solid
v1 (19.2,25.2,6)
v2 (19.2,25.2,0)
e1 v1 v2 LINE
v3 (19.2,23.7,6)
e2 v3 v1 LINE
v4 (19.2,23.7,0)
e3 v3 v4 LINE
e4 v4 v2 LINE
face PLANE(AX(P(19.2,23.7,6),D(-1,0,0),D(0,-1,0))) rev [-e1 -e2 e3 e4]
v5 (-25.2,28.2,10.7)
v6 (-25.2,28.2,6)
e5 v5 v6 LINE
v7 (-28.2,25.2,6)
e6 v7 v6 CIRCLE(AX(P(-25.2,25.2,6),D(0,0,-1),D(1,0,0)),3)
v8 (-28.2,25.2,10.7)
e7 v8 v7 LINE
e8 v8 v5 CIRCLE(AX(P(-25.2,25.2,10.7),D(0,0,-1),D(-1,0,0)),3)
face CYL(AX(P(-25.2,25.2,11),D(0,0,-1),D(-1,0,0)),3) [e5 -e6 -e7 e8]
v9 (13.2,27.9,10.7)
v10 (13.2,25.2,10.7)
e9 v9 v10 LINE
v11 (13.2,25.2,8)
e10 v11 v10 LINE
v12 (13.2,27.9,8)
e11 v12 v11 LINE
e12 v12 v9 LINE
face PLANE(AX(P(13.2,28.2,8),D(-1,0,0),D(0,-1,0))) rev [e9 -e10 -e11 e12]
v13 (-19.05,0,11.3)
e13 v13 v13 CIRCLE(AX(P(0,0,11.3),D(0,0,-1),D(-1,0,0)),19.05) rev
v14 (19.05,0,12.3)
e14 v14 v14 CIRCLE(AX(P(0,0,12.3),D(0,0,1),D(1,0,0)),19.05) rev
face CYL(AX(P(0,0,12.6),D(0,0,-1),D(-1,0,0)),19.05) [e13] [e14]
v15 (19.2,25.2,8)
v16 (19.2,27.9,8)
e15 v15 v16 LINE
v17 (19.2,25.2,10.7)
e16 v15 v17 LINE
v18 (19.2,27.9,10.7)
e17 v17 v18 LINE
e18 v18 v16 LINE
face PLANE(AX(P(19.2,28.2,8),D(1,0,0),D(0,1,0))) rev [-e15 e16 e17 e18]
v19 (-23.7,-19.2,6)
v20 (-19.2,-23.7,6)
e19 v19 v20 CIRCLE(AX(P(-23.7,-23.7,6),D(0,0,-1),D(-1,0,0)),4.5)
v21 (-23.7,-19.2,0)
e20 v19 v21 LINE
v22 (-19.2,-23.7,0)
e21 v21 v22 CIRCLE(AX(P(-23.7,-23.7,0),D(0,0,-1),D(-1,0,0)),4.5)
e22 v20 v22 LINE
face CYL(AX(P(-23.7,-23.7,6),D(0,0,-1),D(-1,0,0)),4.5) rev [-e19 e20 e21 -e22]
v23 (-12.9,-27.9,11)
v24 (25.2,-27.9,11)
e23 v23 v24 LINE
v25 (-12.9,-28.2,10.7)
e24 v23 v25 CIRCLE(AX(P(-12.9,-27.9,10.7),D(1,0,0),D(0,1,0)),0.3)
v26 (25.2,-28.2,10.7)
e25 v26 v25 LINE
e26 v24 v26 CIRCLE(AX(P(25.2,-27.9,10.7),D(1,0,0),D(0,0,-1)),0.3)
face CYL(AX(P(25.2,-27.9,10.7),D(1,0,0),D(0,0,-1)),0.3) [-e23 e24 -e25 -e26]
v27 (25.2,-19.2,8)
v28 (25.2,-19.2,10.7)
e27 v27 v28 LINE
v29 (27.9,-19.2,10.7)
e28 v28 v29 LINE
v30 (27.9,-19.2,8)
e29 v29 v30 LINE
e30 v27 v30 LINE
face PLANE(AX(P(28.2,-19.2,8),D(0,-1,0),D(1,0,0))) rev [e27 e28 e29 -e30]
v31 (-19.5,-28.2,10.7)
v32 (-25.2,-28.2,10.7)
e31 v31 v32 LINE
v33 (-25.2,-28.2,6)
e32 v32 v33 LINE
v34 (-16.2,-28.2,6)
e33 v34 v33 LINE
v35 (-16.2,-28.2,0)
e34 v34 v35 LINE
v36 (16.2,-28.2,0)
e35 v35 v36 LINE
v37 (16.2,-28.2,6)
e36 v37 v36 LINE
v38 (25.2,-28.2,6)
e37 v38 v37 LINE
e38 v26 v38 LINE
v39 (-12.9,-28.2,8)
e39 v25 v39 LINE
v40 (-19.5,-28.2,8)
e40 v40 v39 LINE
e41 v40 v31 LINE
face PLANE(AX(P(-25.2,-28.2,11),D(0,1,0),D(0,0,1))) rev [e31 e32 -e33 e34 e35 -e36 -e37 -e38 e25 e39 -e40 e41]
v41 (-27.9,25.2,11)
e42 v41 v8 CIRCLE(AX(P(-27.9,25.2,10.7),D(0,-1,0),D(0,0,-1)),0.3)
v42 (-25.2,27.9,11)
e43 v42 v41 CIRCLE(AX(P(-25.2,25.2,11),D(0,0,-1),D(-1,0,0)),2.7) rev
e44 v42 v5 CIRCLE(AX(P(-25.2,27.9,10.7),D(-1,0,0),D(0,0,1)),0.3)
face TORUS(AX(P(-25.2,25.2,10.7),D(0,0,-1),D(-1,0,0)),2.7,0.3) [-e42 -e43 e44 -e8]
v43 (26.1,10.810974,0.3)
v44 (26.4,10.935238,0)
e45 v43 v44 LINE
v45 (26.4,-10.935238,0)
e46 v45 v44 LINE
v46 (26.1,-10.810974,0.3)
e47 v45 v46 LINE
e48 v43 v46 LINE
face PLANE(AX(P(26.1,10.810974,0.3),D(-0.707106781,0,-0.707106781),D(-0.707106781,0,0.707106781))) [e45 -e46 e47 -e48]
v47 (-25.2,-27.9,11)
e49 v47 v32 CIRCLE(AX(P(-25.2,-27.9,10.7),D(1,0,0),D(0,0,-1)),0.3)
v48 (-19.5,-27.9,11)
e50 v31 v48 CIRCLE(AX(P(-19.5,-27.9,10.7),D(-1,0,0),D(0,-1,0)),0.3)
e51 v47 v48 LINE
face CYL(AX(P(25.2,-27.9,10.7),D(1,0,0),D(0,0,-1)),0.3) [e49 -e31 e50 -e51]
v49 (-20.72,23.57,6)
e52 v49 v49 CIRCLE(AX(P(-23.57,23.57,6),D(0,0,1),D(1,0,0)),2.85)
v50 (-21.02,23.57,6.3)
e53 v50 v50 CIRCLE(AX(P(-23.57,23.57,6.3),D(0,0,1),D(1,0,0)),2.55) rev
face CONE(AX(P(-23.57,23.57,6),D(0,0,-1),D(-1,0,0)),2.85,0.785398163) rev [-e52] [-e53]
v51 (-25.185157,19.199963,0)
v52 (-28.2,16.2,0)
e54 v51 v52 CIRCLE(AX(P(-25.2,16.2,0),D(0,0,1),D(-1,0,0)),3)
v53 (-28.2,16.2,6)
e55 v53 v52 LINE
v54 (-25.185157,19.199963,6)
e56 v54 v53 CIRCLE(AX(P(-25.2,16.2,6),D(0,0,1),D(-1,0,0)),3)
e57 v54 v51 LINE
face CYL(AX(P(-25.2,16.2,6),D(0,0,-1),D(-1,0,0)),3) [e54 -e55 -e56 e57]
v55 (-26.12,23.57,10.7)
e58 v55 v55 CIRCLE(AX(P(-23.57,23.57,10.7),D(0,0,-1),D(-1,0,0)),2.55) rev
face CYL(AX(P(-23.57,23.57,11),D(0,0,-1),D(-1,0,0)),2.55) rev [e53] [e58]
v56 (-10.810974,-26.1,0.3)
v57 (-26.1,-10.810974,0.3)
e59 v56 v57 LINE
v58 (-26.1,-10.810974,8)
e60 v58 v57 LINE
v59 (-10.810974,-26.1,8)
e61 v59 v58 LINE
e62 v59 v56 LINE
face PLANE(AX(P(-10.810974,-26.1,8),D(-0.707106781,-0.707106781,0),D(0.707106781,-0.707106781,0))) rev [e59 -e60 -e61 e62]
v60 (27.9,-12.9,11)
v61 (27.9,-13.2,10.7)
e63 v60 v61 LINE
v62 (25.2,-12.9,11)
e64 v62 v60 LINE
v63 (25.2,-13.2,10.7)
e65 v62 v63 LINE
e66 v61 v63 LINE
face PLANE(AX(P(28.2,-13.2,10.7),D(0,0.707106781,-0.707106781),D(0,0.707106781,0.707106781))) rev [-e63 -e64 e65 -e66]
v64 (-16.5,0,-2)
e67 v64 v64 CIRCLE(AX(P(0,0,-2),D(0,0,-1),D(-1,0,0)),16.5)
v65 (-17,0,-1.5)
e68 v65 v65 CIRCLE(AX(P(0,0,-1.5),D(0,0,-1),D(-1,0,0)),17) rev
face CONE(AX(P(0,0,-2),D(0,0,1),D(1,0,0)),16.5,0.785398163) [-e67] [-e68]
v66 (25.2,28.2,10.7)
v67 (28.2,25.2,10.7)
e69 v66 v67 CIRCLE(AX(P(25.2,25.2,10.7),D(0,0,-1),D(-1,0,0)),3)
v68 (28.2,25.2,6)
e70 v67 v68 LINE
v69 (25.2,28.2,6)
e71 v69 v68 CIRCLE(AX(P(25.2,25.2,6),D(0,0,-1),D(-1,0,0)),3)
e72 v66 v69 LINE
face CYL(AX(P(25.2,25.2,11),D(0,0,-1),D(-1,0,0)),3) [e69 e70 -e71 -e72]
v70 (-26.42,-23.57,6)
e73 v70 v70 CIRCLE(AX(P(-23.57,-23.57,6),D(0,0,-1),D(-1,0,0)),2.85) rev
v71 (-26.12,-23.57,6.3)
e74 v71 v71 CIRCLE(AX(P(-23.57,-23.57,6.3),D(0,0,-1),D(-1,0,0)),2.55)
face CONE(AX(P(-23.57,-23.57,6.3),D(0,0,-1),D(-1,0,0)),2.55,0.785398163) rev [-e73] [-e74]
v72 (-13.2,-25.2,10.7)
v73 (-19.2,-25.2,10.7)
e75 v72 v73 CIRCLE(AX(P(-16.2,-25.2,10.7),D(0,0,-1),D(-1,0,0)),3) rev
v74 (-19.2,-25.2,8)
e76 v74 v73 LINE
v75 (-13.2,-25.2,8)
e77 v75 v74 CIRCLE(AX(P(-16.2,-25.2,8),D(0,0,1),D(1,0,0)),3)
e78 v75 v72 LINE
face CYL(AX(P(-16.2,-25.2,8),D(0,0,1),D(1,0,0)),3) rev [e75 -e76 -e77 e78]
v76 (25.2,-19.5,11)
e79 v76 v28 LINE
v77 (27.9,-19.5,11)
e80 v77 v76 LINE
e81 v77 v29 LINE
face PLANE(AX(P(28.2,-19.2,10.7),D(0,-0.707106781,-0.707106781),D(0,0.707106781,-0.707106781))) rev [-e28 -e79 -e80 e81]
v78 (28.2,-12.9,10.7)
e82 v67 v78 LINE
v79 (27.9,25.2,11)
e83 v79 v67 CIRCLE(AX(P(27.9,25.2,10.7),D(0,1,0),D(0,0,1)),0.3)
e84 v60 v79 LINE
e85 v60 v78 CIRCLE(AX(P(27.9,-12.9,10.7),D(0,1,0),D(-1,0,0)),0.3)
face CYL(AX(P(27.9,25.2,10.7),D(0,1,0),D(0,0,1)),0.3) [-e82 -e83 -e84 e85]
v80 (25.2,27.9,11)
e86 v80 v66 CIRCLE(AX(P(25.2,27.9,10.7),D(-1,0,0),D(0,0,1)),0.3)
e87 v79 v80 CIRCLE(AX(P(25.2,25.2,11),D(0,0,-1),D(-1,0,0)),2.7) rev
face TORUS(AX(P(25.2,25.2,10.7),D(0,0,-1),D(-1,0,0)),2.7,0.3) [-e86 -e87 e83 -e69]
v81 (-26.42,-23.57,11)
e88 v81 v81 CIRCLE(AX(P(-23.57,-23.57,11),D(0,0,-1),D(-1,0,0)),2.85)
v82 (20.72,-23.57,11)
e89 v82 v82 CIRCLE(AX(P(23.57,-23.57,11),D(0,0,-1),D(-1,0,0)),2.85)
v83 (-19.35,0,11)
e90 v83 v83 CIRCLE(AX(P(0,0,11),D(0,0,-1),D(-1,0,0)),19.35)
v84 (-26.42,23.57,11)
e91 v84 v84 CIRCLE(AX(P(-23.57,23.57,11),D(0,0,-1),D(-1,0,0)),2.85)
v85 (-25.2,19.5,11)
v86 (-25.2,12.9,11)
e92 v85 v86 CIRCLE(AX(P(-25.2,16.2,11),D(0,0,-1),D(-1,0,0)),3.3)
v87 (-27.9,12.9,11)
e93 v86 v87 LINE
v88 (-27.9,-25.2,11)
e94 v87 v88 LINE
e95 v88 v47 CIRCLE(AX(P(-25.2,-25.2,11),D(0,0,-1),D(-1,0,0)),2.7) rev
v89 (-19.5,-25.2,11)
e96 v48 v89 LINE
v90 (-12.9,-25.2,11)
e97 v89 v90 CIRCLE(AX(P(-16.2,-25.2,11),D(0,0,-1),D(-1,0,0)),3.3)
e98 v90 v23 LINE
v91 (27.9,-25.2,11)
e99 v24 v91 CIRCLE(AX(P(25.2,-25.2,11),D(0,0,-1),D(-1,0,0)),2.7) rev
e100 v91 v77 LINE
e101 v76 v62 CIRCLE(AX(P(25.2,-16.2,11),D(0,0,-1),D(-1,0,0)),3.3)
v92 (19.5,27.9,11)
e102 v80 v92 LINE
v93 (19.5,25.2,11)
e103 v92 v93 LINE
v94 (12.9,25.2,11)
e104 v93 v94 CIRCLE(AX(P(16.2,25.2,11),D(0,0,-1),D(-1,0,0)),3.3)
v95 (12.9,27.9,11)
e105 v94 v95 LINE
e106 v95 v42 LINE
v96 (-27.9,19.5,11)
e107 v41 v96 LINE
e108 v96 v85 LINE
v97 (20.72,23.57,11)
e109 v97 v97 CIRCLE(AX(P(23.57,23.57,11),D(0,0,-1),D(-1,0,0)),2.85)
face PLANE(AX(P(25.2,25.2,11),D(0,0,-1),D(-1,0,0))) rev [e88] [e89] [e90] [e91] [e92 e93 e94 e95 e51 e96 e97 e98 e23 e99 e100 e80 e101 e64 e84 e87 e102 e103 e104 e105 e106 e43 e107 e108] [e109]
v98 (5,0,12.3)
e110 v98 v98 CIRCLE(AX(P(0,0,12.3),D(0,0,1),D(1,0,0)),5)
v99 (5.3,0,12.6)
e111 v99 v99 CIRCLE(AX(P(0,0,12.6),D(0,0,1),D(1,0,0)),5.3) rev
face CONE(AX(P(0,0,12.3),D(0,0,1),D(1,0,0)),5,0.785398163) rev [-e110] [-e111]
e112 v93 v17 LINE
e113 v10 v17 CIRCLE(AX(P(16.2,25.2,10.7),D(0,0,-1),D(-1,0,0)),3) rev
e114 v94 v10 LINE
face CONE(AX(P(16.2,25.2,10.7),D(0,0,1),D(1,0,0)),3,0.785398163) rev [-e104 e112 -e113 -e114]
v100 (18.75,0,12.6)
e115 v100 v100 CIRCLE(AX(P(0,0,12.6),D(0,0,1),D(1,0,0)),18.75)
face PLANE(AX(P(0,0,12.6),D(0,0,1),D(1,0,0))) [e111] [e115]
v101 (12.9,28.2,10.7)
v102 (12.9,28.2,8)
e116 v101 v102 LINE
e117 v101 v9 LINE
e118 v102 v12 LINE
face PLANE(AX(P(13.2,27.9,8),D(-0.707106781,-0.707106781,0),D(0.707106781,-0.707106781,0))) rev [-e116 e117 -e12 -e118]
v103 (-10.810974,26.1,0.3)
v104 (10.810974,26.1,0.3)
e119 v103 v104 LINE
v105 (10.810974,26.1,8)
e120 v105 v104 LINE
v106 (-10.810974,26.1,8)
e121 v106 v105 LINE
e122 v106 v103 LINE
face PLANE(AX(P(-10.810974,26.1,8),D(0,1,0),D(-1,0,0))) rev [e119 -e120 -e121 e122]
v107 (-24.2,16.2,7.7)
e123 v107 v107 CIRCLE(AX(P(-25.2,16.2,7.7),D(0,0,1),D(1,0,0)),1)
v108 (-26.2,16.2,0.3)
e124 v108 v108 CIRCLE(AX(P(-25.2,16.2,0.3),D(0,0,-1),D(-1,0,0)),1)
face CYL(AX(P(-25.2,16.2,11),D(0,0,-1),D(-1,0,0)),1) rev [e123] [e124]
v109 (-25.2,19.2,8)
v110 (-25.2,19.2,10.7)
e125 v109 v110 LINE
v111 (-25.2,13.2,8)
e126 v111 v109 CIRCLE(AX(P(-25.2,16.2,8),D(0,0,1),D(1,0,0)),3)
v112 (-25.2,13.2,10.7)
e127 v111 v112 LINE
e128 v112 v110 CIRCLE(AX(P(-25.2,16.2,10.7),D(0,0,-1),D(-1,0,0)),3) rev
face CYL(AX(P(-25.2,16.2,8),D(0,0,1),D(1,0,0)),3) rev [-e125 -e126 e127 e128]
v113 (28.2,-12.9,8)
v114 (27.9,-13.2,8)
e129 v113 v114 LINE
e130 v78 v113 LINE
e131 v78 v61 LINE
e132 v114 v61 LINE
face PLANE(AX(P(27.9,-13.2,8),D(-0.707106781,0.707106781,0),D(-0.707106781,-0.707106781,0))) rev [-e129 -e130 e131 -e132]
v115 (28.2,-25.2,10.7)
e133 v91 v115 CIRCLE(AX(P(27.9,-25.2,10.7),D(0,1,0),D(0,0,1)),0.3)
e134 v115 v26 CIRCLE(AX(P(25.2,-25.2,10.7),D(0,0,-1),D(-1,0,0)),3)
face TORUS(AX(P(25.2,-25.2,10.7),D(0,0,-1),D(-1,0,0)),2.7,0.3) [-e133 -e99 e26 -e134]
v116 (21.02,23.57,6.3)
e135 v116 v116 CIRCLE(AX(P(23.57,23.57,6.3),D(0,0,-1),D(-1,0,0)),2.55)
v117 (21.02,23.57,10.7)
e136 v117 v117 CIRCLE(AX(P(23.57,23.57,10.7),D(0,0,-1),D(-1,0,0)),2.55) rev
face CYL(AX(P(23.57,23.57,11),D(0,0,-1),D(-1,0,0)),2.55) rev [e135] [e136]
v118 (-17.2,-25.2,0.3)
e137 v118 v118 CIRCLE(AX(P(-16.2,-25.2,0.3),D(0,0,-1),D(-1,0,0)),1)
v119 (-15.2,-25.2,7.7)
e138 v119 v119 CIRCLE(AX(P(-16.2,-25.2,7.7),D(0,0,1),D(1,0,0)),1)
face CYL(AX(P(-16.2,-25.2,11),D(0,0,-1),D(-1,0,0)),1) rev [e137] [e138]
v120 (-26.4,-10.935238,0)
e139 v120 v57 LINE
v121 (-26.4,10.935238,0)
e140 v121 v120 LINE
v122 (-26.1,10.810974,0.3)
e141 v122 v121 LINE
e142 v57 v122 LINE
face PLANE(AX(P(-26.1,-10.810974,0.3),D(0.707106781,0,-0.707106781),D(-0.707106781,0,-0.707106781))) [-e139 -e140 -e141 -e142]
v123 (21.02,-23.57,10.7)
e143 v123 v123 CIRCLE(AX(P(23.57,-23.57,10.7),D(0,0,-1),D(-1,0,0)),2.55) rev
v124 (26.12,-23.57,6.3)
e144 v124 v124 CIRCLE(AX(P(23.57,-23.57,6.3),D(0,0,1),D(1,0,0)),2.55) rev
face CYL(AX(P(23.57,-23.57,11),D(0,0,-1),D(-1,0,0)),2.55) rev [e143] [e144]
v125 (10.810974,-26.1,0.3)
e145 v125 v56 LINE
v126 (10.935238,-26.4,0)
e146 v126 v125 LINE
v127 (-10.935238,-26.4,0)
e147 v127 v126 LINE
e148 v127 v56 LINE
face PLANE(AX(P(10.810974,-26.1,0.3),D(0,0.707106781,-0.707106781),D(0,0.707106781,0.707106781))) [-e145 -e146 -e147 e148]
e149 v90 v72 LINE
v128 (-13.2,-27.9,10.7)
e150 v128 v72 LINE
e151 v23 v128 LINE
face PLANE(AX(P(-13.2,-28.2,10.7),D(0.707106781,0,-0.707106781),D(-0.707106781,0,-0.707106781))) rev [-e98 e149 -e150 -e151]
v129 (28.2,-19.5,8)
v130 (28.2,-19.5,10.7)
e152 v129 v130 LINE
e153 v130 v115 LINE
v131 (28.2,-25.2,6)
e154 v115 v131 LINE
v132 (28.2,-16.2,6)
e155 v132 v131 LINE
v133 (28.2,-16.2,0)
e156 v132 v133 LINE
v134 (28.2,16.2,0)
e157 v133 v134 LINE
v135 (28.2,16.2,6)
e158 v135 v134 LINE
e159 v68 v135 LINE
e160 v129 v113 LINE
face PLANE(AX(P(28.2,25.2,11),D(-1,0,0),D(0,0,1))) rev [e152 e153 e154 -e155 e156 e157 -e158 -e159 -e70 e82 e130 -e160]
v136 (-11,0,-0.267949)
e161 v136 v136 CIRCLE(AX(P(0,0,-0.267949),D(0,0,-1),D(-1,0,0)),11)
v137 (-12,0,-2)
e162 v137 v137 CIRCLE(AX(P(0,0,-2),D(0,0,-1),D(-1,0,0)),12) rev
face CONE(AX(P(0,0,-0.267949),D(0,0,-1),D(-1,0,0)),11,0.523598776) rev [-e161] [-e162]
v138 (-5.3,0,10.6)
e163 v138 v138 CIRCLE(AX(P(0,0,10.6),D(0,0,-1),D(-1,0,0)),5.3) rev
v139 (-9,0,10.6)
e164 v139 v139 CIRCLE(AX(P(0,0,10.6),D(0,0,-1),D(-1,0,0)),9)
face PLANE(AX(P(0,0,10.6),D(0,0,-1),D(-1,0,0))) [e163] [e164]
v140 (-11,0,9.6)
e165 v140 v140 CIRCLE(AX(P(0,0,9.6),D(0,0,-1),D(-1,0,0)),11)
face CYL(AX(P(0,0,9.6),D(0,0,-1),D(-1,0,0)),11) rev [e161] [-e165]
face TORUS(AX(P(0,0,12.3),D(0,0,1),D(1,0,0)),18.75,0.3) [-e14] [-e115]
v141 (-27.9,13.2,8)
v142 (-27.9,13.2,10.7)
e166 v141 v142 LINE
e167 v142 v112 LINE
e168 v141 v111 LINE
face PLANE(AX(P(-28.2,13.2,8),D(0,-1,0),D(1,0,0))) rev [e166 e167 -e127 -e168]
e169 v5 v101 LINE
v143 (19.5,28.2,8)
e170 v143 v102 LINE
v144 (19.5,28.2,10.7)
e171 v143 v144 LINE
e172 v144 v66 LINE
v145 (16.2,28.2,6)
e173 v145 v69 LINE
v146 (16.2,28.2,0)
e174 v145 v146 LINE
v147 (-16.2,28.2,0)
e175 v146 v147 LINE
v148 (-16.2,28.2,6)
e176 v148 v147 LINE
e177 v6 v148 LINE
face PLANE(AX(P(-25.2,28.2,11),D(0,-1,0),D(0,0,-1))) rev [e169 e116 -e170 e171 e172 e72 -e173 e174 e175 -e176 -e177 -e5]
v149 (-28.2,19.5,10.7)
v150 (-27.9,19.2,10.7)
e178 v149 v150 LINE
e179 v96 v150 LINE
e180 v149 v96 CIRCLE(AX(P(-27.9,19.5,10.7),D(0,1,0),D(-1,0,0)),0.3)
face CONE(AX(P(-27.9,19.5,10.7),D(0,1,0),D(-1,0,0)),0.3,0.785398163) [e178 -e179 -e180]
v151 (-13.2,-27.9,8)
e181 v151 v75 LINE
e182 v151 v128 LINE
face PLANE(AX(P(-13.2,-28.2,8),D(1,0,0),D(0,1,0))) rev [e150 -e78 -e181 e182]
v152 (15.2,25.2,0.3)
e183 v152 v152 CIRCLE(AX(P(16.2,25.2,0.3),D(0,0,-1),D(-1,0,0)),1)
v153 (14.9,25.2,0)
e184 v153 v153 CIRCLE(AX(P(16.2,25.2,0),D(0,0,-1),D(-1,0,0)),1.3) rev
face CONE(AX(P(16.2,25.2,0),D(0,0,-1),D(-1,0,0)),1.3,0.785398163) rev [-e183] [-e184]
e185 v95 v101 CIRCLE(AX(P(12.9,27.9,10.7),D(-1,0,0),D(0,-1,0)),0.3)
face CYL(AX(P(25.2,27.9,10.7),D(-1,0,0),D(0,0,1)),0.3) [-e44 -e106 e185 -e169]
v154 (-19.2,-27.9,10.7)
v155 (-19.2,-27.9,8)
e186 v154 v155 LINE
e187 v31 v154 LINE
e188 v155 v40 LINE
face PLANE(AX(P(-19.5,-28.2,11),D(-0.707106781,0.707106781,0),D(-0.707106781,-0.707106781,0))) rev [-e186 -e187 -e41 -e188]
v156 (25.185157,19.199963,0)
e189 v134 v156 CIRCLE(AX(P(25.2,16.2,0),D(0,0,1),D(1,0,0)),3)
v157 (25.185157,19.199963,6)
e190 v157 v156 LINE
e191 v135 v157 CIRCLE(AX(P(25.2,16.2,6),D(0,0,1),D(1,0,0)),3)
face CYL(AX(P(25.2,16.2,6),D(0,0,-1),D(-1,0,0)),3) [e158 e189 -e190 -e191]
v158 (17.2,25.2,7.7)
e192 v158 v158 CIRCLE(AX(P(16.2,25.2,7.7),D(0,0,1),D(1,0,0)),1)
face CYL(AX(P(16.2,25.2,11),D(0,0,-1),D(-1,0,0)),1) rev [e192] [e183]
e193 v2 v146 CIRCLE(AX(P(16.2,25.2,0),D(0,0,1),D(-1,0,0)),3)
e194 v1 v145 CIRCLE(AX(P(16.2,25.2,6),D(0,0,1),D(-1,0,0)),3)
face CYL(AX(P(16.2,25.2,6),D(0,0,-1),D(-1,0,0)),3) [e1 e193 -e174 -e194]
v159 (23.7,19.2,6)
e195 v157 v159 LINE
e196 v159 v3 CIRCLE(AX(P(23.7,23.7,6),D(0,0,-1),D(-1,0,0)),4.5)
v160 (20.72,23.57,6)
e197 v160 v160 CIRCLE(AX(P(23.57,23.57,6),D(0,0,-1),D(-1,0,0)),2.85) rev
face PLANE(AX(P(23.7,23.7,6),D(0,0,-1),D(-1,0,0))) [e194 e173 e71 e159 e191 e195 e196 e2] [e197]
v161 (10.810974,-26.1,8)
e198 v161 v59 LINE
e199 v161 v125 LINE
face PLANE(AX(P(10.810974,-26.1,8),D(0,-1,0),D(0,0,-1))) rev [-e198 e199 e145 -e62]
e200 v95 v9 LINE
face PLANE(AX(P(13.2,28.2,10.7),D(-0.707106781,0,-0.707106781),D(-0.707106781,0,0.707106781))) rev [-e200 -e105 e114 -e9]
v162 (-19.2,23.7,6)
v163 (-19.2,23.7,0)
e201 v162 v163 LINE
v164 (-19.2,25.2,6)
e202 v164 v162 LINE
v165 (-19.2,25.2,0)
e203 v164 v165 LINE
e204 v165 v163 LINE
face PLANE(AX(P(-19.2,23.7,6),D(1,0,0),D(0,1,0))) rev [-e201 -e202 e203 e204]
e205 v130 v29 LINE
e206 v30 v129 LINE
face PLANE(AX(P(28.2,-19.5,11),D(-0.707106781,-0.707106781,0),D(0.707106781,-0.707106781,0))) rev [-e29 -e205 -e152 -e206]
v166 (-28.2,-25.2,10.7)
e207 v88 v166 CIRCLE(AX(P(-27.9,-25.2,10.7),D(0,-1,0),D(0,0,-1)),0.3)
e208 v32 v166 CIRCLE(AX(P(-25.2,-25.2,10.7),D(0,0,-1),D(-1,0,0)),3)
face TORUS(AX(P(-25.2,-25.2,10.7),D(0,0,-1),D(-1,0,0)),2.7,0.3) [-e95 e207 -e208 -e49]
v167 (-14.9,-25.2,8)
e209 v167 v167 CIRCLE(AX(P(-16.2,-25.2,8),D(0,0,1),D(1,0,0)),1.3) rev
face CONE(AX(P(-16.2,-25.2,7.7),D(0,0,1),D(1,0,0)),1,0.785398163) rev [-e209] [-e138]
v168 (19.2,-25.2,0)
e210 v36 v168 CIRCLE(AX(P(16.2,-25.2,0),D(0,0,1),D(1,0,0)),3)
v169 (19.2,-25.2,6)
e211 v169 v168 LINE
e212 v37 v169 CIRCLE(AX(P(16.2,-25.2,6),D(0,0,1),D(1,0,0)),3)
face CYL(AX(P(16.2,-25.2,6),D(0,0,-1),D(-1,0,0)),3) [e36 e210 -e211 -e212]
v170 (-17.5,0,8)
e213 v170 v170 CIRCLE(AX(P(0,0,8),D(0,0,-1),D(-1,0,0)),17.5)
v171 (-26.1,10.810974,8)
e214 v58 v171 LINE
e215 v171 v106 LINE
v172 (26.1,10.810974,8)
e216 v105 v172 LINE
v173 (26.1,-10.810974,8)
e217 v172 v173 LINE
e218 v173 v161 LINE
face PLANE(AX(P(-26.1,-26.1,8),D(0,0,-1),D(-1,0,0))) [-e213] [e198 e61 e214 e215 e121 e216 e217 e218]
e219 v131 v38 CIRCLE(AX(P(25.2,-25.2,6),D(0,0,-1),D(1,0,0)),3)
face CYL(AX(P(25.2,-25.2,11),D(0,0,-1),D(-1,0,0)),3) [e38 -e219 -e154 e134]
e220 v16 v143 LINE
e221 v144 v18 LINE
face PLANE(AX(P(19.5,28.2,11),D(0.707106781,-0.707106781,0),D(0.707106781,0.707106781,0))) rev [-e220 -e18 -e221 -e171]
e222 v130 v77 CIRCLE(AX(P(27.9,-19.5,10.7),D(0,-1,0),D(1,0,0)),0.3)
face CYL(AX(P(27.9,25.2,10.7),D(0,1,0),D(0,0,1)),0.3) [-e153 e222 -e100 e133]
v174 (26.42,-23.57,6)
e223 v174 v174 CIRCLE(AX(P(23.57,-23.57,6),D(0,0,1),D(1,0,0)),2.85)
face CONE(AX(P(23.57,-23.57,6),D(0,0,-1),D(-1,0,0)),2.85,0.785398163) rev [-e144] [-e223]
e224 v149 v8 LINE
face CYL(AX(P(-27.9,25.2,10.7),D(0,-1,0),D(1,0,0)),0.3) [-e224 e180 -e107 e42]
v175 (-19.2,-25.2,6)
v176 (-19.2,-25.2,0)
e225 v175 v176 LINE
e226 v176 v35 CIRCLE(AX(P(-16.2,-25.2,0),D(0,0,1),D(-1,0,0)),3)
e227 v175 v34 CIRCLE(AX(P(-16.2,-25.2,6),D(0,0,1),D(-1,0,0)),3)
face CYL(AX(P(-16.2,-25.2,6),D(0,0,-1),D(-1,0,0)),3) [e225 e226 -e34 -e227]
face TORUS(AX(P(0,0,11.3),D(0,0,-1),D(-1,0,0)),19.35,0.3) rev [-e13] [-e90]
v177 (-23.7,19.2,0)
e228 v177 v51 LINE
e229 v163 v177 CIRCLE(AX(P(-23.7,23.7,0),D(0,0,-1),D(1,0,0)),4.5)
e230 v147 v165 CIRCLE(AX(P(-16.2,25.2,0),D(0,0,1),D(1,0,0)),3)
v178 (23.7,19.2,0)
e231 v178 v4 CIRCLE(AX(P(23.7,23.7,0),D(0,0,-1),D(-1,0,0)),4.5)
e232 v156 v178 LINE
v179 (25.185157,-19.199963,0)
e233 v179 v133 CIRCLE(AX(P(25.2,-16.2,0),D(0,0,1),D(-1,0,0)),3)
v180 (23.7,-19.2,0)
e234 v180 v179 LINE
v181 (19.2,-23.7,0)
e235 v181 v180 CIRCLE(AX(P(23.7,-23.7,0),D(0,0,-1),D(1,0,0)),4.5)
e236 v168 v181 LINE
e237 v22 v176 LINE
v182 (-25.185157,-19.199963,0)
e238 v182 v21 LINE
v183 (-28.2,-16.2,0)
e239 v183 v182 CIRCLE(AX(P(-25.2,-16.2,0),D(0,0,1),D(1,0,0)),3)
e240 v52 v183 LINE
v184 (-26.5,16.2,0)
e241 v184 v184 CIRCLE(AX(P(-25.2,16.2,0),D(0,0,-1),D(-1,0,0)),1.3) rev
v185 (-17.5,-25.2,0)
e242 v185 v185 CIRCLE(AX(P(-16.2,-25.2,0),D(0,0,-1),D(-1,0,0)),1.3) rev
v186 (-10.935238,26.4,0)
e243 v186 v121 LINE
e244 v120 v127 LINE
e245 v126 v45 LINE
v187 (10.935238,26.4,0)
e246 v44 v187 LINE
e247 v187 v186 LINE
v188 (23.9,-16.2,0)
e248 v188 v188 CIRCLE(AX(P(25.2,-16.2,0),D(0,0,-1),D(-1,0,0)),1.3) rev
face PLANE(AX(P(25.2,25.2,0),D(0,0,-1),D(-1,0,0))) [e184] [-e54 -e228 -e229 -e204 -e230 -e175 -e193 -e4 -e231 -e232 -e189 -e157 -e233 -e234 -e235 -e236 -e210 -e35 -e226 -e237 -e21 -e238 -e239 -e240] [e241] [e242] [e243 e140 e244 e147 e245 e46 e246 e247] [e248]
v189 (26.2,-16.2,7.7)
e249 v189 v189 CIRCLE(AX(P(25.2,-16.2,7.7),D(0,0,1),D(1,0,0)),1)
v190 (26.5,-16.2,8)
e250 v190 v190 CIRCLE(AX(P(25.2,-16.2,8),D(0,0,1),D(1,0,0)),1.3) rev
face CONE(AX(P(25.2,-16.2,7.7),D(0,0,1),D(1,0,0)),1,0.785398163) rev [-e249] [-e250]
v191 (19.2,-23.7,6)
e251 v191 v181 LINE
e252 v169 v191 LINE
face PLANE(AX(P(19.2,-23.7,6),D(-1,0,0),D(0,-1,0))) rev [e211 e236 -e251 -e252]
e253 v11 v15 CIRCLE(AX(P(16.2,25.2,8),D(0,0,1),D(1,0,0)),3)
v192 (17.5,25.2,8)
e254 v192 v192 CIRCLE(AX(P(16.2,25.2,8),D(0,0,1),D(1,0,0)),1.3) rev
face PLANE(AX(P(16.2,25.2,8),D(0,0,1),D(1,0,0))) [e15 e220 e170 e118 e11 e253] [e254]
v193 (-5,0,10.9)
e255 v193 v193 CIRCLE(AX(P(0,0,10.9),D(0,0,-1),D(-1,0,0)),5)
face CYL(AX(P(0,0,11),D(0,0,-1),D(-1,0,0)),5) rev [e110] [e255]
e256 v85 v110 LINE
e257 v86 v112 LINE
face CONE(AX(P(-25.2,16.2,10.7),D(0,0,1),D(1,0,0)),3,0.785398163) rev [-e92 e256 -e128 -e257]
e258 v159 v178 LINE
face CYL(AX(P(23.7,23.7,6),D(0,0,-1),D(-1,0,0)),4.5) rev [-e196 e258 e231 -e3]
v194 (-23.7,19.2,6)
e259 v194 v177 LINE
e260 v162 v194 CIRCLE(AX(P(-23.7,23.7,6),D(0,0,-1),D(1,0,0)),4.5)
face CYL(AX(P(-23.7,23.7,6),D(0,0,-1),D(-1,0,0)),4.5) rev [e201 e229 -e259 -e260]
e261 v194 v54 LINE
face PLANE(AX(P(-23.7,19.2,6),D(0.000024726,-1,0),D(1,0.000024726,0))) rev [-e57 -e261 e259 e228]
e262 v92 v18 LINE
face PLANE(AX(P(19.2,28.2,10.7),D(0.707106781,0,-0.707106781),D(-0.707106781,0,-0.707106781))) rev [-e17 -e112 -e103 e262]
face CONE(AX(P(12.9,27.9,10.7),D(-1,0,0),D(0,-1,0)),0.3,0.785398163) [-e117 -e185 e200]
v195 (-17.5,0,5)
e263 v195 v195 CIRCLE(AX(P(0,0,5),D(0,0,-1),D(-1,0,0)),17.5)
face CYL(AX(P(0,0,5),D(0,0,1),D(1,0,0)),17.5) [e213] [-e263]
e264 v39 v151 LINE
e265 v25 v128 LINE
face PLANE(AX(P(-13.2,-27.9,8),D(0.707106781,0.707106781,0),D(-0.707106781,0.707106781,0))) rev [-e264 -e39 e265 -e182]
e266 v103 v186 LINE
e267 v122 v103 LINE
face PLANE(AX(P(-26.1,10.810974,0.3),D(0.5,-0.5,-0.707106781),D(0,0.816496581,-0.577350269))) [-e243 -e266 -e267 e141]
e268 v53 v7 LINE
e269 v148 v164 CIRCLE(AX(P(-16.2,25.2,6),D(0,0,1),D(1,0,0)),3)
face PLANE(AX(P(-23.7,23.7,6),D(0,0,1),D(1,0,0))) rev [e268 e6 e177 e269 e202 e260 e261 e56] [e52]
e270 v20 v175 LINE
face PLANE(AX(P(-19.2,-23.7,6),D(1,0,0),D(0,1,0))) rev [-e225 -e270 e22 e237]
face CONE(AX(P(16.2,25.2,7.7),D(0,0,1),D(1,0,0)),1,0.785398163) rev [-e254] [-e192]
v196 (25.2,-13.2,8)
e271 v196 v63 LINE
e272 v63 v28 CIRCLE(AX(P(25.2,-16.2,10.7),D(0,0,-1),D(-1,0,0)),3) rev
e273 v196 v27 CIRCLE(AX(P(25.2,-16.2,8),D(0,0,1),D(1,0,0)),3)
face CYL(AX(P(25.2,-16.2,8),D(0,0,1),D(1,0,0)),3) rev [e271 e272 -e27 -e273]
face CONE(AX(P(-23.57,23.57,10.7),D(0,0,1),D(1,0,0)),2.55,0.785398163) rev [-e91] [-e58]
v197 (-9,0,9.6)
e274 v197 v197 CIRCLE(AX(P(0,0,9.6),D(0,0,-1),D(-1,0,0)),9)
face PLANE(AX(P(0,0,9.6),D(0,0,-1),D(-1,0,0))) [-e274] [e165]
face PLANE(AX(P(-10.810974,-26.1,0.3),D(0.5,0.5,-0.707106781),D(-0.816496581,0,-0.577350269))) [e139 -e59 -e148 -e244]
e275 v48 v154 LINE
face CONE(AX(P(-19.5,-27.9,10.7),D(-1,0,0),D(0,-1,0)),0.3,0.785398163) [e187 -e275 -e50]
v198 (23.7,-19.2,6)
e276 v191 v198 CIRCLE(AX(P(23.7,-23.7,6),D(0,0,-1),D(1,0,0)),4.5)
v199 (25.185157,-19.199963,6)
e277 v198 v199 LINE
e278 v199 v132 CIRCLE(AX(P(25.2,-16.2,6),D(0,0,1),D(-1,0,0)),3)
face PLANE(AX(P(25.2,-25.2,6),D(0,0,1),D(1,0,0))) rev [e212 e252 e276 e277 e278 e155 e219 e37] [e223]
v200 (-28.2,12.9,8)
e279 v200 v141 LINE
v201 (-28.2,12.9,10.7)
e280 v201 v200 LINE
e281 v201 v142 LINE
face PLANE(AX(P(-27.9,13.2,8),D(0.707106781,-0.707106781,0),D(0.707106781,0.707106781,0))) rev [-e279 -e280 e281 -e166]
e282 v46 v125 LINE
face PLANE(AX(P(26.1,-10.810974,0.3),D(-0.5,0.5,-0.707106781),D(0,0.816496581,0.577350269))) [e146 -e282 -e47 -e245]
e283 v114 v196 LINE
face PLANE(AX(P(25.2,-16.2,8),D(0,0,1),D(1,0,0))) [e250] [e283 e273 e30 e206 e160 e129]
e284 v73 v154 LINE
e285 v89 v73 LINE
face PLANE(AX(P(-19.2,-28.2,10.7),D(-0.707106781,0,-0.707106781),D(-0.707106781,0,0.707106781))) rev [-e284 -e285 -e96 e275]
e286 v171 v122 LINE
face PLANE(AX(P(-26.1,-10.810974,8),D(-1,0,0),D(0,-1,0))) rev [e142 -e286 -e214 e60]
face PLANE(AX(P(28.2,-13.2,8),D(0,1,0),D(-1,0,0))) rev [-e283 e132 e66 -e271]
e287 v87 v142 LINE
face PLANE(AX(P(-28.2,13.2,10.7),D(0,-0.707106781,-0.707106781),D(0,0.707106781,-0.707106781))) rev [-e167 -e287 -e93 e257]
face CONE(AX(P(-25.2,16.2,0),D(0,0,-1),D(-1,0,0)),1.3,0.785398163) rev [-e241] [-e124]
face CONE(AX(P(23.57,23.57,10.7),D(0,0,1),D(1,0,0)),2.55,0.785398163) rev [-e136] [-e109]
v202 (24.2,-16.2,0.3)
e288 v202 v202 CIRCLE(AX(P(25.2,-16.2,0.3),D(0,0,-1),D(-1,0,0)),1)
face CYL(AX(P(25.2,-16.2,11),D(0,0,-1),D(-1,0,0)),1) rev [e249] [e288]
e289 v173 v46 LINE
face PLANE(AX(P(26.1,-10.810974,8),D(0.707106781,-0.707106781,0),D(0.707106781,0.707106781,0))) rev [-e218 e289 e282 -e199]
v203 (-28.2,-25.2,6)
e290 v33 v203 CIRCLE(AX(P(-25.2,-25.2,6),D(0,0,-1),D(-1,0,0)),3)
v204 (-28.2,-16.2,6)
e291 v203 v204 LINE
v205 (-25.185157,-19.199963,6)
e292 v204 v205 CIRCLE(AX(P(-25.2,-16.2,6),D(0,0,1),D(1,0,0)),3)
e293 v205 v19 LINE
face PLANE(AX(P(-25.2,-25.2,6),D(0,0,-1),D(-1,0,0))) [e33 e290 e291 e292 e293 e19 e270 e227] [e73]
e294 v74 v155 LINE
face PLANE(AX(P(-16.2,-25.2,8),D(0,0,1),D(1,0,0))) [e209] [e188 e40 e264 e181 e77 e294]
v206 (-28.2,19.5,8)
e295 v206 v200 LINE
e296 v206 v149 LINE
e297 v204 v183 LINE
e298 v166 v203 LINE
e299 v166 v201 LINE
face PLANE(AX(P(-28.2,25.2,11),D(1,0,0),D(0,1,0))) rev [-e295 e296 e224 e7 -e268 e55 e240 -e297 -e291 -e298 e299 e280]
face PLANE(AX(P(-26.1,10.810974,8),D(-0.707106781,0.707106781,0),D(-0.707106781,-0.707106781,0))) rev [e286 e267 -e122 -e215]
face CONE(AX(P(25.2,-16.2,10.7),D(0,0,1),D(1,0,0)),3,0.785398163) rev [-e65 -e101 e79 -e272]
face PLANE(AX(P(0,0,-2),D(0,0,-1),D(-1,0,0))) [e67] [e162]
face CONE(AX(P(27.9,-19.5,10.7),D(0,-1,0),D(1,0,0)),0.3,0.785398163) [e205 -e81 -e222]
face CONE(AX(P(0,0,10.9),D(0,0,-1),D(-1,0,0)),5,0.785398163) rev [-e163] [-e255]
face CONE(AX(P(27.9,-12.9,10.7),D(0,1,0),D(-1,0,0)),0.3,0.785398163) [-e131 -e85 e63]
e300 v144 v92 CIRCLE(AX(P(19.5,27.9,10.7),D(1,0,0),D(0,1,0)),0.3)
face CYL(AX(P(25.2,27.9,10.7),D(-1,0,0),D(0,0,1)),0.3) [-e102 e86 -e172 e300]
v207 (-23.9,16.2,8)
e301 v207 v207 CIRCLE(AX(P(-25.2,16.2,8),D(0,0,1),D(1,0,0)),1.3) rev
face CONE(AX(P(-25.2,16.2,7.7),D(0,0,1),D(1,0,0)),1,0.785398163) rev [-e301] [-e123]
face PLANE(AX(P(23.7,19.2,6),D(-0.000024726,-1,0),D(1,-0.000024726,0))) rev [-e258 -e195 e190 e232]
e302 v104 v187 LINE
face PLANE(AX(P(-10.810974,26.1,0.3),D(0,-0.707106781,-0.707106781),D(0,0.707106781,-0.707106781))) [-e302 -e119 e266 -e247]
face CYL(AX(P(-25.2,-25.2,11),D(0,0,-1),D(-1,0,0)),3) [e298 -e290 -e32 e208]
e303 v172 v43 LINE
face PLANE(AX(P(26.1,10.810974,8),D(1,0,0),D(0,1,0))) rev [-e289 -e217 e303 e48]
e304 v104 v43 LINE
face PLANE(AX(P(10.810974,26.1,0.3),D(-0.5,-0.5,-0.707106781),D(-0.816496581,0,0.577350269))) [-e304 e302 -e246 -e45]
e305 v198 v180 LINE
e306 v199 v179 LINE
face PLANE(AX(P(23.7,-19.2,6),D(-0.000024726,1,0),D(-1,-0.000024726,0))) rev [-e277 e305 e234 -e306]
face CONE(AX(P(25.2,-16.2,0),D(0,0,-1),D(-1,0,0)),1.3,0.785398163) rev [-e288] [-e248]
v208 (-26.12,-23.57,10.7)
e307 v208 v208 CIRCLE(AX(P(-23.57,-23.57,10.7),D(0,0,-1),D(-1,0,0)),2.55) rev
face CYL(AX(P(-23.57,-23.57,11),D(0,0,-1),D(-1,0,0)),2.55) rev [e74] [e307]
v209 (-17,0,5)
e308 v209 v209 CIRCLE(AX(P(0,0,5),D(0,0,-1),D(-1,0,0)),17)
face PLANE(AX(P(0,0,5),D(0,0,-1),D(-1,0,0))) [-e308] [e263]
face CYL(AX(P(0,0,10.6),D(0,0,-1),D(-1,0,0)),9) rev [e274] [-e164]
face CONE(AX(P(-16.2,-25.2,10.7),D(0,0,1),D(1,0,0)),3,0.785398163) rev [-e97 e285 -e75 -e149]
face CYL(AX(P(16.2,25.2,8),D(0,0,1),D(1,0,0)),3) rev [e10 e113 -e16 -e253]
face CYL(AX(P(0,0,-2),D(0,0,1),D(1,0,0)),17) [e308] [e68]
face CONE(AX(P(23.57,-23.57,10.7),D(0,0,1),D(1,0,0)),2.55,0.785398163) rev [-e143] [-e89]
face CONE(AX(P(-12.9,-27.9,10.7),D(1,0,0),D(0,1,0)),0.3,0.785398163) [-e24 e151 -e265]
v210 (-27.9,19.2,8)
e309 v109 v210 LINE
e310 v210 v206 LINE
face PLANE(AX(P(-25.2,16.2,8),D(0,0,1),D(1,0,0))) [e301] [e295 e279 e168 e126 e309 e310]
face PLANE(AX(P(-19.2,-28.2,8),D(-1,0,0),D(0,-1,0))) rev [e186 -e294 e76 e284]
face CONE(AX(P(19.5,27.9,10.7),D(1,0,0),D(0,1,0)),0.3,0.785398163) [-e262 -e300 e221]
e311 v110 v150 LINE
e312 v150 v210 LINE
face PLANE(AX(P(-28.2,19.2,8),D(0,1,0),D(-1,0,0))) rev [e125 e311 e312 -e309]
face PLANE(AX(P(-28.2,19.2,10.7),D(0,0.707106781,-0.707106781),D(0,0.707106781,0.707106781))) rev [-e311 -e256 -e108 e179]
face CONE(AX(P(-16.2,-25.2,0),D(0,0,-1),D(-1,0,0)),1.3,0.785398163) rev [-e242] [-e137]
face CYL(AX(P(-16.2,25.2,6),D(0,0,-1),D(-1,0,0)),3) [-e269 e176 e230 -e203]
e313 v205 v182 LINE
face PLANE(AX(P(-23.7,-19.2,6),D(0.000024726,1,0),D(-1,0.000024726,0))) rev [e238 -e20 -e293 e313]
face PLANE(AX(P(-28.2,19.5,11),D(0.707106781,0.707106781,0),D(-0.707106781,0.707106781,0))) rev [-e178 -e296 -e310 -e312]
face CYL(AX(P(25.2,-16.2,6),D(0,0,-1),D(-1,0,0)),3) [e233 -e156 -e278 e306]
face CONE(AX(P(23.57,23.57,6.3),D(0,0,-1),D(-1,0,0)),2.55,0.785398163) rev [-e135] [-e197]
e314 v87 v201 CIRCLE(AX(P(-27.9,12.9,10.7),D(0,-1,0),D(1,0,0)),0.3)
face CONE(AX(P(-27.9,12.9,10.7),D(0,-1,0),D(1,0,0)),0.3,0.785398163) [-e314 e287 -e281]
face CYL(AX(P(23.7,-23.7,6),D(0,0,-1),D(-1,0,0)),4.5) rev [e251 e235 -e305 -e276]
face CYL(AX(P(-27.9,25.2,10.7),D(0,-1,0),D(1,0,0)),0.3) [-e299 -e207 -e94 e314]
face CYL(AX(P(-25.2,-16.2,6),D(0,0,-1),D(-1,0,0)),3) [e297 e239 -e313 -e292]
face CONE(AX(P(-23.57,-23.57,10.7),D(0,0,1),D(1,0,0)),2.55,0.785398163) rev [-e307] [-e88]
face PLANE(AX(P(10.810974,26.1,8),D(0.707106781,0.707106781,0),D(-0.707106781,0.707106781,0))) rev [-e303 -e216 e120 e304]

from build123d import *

# Parameters (mm, degrees)
SKETCH1_R           = 5
SKETCH1_R_2         = 2.55
SKETCH1_R_3         = 1
BOSS_EXTRUDE1_DEPTH = 11
SKETCH2_R           = 19.05
SKETCH2_R_2         = 5
BOSS_EXTRUDE2_DEPTH = 1.6
CUT_EXTRUDE1_DEPTH  = 3
FILLET1_R           = 0.3
CHAMFER1_SIZE       = 0.3
CUT_EXTRUDE2_DEPTH  = 6
CHAMFER2_SIZE       = 0.3
CUT_EXTRUDE3_DEPTH  = 8
SKETCH6_R           = 9
SKETCH6_R_2         = 5
CUT_EXTRUDE4_DEPTH  = 2.6
SKETCH7_R           = 11
SKETCH7_R_2         = 9
CUT_EXTRUDE5_DEPTH  = 1.6
BOSS_EXTRUDE3_START = 3
SKETCH8_R           = 17.5
SKETCH8_R_2         = 11
BOSS_EXTRUDE3_DEPTH = 3
BOSS_EXTRUDE4_START = 7
SKETCH9_R           = 17
SKETCH9_R_2         = 11
BOSS_EXTRUDE4_DEPTH = 7
CHAMFER3_SIZE       = 0.3
CHAMFER4_SIZE       = 0.5
CHAMFER5_SIZE       = 1
CHAMFER5_SIZE2      = 1.732050808


with BuildPart() as part:
    # Sketch1 → Boss-Extrude1 (new body)
    with BuildSketch(Plane.XY):
        with BuildLine():
            Line((-25.2, 28.2), (25.2, 28.2))
            ThreePointArc((25.2, 28.2), (27.321320344, 27.321320344), (28.2, 25.2))
            Line((28.2, 25.2), (28.2, -25.2))
            ThreePointArc((28.2, -25.2), (27.321320344, -27.321320344), (25.2, -28.2))
            Line((25.2, -28.2), (-25.2, -28.2))
            ThreePointArc((-25.2, -28.2), (-27.321320344, -27.321320344), (-28.2, -25.2))
            Line((-28.2, -25.2), (-28.2, 25.2))
            ThreePointArc((-28.2, 25.2), (-27.321320344, 27.321320344), (-25.2, 28.2))
        make_face()
        Circle(SKETCH1_R, mode=Mode.SUBTRACT)
        with Locations((-23.57, 23.57)):
            Circle(SKETCH1_R_2, mode=Mode.SUBTRACT)
        with Locations(Location((23.57, 23.57, 0), (0, 0, 180))):
            Circle(SKETCH1_R_2, mode=Mode.SUBTRACT)
        with Locations((23.57, -23.57)):
            Circle(SKETCH1_R_2, mode=Mode.SUBTRACT)
        with Locations(Location((-23.57, -23.57, 0), (0, 0, 180))):
            Circle(SKETCH1_R_2, mode=Mode.SUBTRACT)
        with Locations((16.2, 25.2)):
            Circle(SKETCH1_R_3, mode=Mode.SUBTRACT)
        with Locations((-25.2, 16.2)):
            Circle(SKETCH1_R_3, mode=Mode.SUBTRACT)
        with Locations((-16.2, -25.2)):
            Circle(SKETCH1_R_3, mode=Mode.SUBTRACT)
        with Locations((25.2, -16.2)):
            Circle(SKETCH1_R_3, mode=Mode.SUBTRACT)
    extrude(amount=BOSS_EXTRUDE1_DEPTH)

    # Sketch2 → Boss-Extrude2 (add)
    with BuildSketch(Plane.XY.offset(11)):
        with Locations(Location((0, 0, 0), (0, 0, 180))):
            Circle(SKETCH2_R)
        Circle(SKETCH2_R_2, mode=Mode.SUBTRACT)
    extrude(amount=BOSS_EXTRUDE2_DEPTH)

    # Sketch3 → Cut-Extrude1 (cut)
    with BuildSketch(Plane.XY.offset(11)):
        with BuildLine():
            Line((13.2, 28.2), (19.2, 28.2))
            Line((19.2, 28.2), (19.2, 25.2))
            ThreePointArc((19.2, 25.2), (16.2, 22.2), (13.2, 25.2))
            Line((13.2, 25.2), (13.2, 28.2))
        make_face()
        with BuildLine():
            Line((-28.2, 13.2), (-28.2, 19.2))
            Line((-28.2, 19.2), (-25.2, 19.2))
            ThreePointArc((-25.2, 19.2), (-22.2, 16.2), (-25.2, 13.2))
            Line((-25.2, 13.2), (-28.2, 13.2))
        make_face()
        with BuildLine():
            Line((28.2, -13.2), (28.2, -19.2))
            Line((28.2, -19.2), (25.2, -19.2))
            ThreePointArc((25.2, -19.2), (22.2, -16.2), (25.2, -13.2))
            Line((25.2, -13.2), (28.2, -13.2))
        make_face()
        with BuildLine():
            Line((-13.2, -28.2), (-13.2, -25.2))
            ThreePointArc((-13.2, -25.2), (-16.2, -22.2), (-19.2, -25.2))
            Line((-19.2, -25.2), (-19.2, -28.2))
            Line((-19.2, -28.2), (-13.2, -28.2))
        make_face()
    extrude(amount=-CUT_EXTRUDE1_DEPTH, mode=Mode.SUBTRACT)

    # Fillet1
    fillet1_edges = [part.edges().sort_by_distance(p)[0] for p in [
        (-27.321320344, 27.321320344, 11),
        (6, -28.2, 11),
        (-28.2, 22.2, 11),
        (-27.321320344, -27.321320344, 11),
        (-22.2, -28.2, 11),
        (27.321320344, -27.321320344, 11),
        (28.2, -22.2, 11),
        (27.321320344, 27.321320344, 11),
        (19.05, 0, 11),
        (19.05, 0, 12.6),
        (22.2, 28.2, 11),
        (-6, 28.2, 11),
        (-28.2, -6, 11),
        (28.2, 6, 11),
    ]]
    fillet(fillet1_edges, radius=FILLET1_R)

    # Chamfer1
    chamfer1_edges = [part.edges().sort_by_distance(p)[0] for p in [
        (28.2, -13.2, 9.35),
        (28.2, -19.2, 9.35),
        (24.2, -16.2, 8),
        (22.2, -16.2, 11),
        (26.55, -19.2, 11),
        (-13.2, -28.2, 9.35),
        (-19.2, -28.2, 9.35),
        (-17.2, -25.2, 8),
        (-16.2, -22.2, 11),
        (-19.2, -26.55, 11),
        (-13.2, -26.55, 11),
        (26.55, -13.2, 11),
        (13.2, 26.55, 11),
        (-26.55, 13.2, 11),
        (-28.112132034, 19.2, 10.912132034),
        (19.2, 28.112132034, 10.912132034),
        (28.112132034, -19.2, 10.912132034),
        (-19.2, -28.112132034, 10.912132034),
        (13.2, 28.112132034, 10.912132034),
        (28.112132034, -13.2, 10.912132034),
        (-13.2, -28.112132034, 10.912132034),
        (-28.112132034, 13.2, 10.912132034),
        (19.2, 28.2, 9.35),
        (13.2, 28.2, 9.35),
        (15.2, 25.2, 8),
        (19.2, 26.55, 11),
        (16.2, 22.2, 11),
        (-28.2, 13.2, 9.35),
        (-28.2, 19.2, 9.35),
        (-26.2, 16.2, 8),
        (-22.2, 16.2, 11),
        (-26.55, 19.2, 11),
    ]]
    chamfer(chamfer1_edges, length=CHAMFER1_SIZE - 0.0001)  # a hair under: the kernel refuses the full size

    # Sketch4 → Cut-Extrude2 (cut)
    with BuildSketch(Plane(origin=(0, 0, 0), x_dir=(-1, 0, 0), z_dir=(0, 0, -1))):
        with BuildLine():
            Line((-23.7, 19.2), (-25.185156579, 19.199963279))
            ThreePointArc((-25.185156579, 19.199963279), (-27.316065894, 18.32656181), (-28.2, 16.2))
            Line((-28.2, 16.2), (-28.2, 25.2))
            ThreePointArc((-28.2, 25.2), (-27.321320344, 27.321320344), (-25.2, 28.2))
            Line((-25.2, 28.2), (-16.2, 28.2))
            ThreePointArc((-16.2, 28.2), (-18.321320344, 27.321320344), (-19.2, 25.2))
            Line((-19.2, 25.2), (-19.2, 23.7))
            ThreePointArc((-19.2, 23.7), (-20.518019485, 20.518019485), (-23.7, 19.2))
        make_face()
        with BuildLine():
            Line((19.2, 23.7), (19.2, 25.2))
            ThreePointArc((19.2, 25.2), (18.321320344, 27.321320344), (16.2, 28.2))
            Line((16.2, 28.2), (25.2, 28.2))
            ThreePointArc((25.2, 28.2), (27.321320344, 27.321320344), (28.2, 25.2))
            Line((28.2, 25.2), (28.2, 16.2))
            ThreePointArc((28.2, 16.2), (27.316065894, 18.32656181), (25.185156579, 19.199963279))
            Line((25.185156579, 19.199963279), (23.7, 19.2))
            ThreePointArc((23.7, 19.2), (20.518019485, 20.518019485), (19.2, 23.7))
        make_face()
        with BuildLine():
            Line((-28.2, -16.2), (-28.2, -25.2))
            ThreePointArc((-28.2, -25.2), (-27.321320344, -27.321320344), (-25.2, -28.2))
            Line((-25.2, -28.2), (-16.2, -28.2))
            ThreePointArc((-16.2, -28.2), (-18.321320344, -27.321320344), (-19.2, -25.2))
            Line((-19.2, -25.2), (-19.2, -23.7))
            ThreePointArc((-19.2, -23.7), (-20.518019485, -20.518019485), (-23.7, -19.2))
            Line((-23.7, -19.2), (-25.185156579, -19.199963279))
            ThreePointArc((-25.185156579, -19.199963279), (-27.316065894, -18.32656181), (-28.2, -16.2))
        make_face()
        with BuildLine():
            Line((28.2, -16.2), (28.2, -25.2))
            ThreePointArc((28.2, -25.2), (27.321320344, -27.321320344), (25.2, -28.2))
            Line((25.2, -28.2), (16.2, -28.2))
            ThreePointArc((16.2, -28.2), (18.321320344, -27.321320344), (19.2, -25.2))
            Line((19.2, -25.2), (19.2, -23.7))
            ThreePointArc((19.2, -23.7), (20.518019485, -20.518019485), (23.7, -19.2))
            Line((23.7, -19.2), (25.185156579, -19.199963279))
            ThreePointArc((25.185156579, -19.199963279), (27.316065894, -18.32656181), (28.2, -16.2))
        make_face()
    extrude(amount=-CUT_EXTRUDE2_DEPTH, mode=Mode.SUBTRACT)

    # Chamfer2
    chamfer2_edges = [part.edges().sort_by_distance(p)[0] for p in [
        (-26.12, 23.57, 11),
        (26.12, 23.57, 11),
        (26.12, 23.57, 6),
        (21.02, -23.57, 11),
        (-26.12, 23.57, 6),
        (21.02, -23.57, 6),
        (-21.02, -23.57, 11),
        (-21.02, -23.57, 6),
    ]]
    chamfer(chamfer2_edges, length=CHAMFER2_SIZE)

    # Sketch5 → Cut-Extrude3 (cut)
    with BuildSketch(Plane(origin=(0, 0, 0), x_dir=(-1, 0, 0), z_dir=(0, 0, -1))):
        Polygon((10.810973978, -26.1), (26.1, -10.810973978), (26.1, 10.810973978), (10.810973978, 26.1), (-10.810973978, 26.1), (-26.1, 10.810973978), (-26.1, -10.810973978), (-10.810973978, -26.1), align=None)
    extrude(amount=-CUT_EXTRUDE3_DEPTH, mode=Mode.SUBTRACT)

    # Sketch6 → Cut-Extrude4 (cut)
    with BuildSketch(Plane(origin=(0, 0, 8), x_dir=(-1, 0, 0), z_dir=(0, 0, -1))):
        Circle(SKETCH6_R)
        Circle(SKETCH6_R_2, mode=Mode.SUBTRACT)
    extrude(amount=-CUT_EXTRUDE4_DEPTH, mode=Mode.SUBTRACT)

    # Sketch7 → Cut-Extrude5 (cut)
    with BuildSketch(Plane(origin=(0, 0, 8), x_dir=(-1, 0, 0), z_dir=(0, 0, -1))):
        Circle(SKETCH7_R)
        Circle(SKETCH7_R_2, mode=Mode.SUBTRACT)
    extrude(amount=-CUT_EXTRUDE5_DEPTH, mode=Mode.SUBTRACT)

    # Sketch8 → Boss-Extrude3 (add)
    with BuildSketch(Plane(origin=(0, 0, 8), x_dir=(-1, 0, 0), z_dir=(0, 0, -1)).offset(BOSS_EXTRUDE3_START)):
        Circle(SKETCH8_R)
        Circle(SKETCH8_R_2, mode=Mode.SUBTRACT)
    extrude(amount=-BOSS_EXTRUDE3_DEPTH)

    # Sketch9 → Boss-Extrude4 (add)
    with BuildSketch(Plane(origin=(0, 0, 5), x_dir=(-1, 0, 0), z_dir=(0, 0, -1)).offset(BOSS_EXTRUDE4_START)):
        Circle(SKETCH9_R)
        Circle(SKETCH9_R_2, mode=Mode.SUBTRACT)
    extrude(amount=-BOSS_EXTRUDE4_DEPTH)

    # Chamfer3
    chamfer3_edges = [part.edges().sort_by_distance(p)[0] for p in [
        (15.2, 25.2, 0),
        (-26.2, 16.2, 0),
        (-17.2, -25.2, 0),
        (0, -26.1, 0),
        (-18.455486989, -18.455486989, 0),
        (-26.1, 0, 0),
        (-18.455486989, 18.455486989, 0),
        (0, 26.1, 0),
        (18.455486989, 18.455486989, 0),
        (26.1, 0, 0),
        (18.455486989, -18.455486989, 0),
        (-5, 0, 10.6),
        (24.2, -16.2, 0),
        (-5, 0, 12.6),
    ]]
    chamfer(chamfer3_edges, length=CHAMFER3_SIZE)

    # Chamfer4
    chamfer4_edges = [part.edges().sort_by_distance(p)[0] for p in [
        (17, 0, -2),
    ]]
    chamfer(chamfer4_edges, length=CHAMFER4_SIZE)

    # Chamfer5
    chamfer5_edges = [part.edges().sort_by_distance(p)[0] for p in [
        (11, 0, -2),
    ]]
    chamfer5_side = [part.faces().sort_by_distance(p)[0] for p in [
        (16.033309524, 0, -2),
    ]]
    chamfer(chamfer5_edges, length=CHAMFER5_SIZE, length2=CHAMFER5_SIZE2, reference=chamfer5_side[0])


solid = part.part
